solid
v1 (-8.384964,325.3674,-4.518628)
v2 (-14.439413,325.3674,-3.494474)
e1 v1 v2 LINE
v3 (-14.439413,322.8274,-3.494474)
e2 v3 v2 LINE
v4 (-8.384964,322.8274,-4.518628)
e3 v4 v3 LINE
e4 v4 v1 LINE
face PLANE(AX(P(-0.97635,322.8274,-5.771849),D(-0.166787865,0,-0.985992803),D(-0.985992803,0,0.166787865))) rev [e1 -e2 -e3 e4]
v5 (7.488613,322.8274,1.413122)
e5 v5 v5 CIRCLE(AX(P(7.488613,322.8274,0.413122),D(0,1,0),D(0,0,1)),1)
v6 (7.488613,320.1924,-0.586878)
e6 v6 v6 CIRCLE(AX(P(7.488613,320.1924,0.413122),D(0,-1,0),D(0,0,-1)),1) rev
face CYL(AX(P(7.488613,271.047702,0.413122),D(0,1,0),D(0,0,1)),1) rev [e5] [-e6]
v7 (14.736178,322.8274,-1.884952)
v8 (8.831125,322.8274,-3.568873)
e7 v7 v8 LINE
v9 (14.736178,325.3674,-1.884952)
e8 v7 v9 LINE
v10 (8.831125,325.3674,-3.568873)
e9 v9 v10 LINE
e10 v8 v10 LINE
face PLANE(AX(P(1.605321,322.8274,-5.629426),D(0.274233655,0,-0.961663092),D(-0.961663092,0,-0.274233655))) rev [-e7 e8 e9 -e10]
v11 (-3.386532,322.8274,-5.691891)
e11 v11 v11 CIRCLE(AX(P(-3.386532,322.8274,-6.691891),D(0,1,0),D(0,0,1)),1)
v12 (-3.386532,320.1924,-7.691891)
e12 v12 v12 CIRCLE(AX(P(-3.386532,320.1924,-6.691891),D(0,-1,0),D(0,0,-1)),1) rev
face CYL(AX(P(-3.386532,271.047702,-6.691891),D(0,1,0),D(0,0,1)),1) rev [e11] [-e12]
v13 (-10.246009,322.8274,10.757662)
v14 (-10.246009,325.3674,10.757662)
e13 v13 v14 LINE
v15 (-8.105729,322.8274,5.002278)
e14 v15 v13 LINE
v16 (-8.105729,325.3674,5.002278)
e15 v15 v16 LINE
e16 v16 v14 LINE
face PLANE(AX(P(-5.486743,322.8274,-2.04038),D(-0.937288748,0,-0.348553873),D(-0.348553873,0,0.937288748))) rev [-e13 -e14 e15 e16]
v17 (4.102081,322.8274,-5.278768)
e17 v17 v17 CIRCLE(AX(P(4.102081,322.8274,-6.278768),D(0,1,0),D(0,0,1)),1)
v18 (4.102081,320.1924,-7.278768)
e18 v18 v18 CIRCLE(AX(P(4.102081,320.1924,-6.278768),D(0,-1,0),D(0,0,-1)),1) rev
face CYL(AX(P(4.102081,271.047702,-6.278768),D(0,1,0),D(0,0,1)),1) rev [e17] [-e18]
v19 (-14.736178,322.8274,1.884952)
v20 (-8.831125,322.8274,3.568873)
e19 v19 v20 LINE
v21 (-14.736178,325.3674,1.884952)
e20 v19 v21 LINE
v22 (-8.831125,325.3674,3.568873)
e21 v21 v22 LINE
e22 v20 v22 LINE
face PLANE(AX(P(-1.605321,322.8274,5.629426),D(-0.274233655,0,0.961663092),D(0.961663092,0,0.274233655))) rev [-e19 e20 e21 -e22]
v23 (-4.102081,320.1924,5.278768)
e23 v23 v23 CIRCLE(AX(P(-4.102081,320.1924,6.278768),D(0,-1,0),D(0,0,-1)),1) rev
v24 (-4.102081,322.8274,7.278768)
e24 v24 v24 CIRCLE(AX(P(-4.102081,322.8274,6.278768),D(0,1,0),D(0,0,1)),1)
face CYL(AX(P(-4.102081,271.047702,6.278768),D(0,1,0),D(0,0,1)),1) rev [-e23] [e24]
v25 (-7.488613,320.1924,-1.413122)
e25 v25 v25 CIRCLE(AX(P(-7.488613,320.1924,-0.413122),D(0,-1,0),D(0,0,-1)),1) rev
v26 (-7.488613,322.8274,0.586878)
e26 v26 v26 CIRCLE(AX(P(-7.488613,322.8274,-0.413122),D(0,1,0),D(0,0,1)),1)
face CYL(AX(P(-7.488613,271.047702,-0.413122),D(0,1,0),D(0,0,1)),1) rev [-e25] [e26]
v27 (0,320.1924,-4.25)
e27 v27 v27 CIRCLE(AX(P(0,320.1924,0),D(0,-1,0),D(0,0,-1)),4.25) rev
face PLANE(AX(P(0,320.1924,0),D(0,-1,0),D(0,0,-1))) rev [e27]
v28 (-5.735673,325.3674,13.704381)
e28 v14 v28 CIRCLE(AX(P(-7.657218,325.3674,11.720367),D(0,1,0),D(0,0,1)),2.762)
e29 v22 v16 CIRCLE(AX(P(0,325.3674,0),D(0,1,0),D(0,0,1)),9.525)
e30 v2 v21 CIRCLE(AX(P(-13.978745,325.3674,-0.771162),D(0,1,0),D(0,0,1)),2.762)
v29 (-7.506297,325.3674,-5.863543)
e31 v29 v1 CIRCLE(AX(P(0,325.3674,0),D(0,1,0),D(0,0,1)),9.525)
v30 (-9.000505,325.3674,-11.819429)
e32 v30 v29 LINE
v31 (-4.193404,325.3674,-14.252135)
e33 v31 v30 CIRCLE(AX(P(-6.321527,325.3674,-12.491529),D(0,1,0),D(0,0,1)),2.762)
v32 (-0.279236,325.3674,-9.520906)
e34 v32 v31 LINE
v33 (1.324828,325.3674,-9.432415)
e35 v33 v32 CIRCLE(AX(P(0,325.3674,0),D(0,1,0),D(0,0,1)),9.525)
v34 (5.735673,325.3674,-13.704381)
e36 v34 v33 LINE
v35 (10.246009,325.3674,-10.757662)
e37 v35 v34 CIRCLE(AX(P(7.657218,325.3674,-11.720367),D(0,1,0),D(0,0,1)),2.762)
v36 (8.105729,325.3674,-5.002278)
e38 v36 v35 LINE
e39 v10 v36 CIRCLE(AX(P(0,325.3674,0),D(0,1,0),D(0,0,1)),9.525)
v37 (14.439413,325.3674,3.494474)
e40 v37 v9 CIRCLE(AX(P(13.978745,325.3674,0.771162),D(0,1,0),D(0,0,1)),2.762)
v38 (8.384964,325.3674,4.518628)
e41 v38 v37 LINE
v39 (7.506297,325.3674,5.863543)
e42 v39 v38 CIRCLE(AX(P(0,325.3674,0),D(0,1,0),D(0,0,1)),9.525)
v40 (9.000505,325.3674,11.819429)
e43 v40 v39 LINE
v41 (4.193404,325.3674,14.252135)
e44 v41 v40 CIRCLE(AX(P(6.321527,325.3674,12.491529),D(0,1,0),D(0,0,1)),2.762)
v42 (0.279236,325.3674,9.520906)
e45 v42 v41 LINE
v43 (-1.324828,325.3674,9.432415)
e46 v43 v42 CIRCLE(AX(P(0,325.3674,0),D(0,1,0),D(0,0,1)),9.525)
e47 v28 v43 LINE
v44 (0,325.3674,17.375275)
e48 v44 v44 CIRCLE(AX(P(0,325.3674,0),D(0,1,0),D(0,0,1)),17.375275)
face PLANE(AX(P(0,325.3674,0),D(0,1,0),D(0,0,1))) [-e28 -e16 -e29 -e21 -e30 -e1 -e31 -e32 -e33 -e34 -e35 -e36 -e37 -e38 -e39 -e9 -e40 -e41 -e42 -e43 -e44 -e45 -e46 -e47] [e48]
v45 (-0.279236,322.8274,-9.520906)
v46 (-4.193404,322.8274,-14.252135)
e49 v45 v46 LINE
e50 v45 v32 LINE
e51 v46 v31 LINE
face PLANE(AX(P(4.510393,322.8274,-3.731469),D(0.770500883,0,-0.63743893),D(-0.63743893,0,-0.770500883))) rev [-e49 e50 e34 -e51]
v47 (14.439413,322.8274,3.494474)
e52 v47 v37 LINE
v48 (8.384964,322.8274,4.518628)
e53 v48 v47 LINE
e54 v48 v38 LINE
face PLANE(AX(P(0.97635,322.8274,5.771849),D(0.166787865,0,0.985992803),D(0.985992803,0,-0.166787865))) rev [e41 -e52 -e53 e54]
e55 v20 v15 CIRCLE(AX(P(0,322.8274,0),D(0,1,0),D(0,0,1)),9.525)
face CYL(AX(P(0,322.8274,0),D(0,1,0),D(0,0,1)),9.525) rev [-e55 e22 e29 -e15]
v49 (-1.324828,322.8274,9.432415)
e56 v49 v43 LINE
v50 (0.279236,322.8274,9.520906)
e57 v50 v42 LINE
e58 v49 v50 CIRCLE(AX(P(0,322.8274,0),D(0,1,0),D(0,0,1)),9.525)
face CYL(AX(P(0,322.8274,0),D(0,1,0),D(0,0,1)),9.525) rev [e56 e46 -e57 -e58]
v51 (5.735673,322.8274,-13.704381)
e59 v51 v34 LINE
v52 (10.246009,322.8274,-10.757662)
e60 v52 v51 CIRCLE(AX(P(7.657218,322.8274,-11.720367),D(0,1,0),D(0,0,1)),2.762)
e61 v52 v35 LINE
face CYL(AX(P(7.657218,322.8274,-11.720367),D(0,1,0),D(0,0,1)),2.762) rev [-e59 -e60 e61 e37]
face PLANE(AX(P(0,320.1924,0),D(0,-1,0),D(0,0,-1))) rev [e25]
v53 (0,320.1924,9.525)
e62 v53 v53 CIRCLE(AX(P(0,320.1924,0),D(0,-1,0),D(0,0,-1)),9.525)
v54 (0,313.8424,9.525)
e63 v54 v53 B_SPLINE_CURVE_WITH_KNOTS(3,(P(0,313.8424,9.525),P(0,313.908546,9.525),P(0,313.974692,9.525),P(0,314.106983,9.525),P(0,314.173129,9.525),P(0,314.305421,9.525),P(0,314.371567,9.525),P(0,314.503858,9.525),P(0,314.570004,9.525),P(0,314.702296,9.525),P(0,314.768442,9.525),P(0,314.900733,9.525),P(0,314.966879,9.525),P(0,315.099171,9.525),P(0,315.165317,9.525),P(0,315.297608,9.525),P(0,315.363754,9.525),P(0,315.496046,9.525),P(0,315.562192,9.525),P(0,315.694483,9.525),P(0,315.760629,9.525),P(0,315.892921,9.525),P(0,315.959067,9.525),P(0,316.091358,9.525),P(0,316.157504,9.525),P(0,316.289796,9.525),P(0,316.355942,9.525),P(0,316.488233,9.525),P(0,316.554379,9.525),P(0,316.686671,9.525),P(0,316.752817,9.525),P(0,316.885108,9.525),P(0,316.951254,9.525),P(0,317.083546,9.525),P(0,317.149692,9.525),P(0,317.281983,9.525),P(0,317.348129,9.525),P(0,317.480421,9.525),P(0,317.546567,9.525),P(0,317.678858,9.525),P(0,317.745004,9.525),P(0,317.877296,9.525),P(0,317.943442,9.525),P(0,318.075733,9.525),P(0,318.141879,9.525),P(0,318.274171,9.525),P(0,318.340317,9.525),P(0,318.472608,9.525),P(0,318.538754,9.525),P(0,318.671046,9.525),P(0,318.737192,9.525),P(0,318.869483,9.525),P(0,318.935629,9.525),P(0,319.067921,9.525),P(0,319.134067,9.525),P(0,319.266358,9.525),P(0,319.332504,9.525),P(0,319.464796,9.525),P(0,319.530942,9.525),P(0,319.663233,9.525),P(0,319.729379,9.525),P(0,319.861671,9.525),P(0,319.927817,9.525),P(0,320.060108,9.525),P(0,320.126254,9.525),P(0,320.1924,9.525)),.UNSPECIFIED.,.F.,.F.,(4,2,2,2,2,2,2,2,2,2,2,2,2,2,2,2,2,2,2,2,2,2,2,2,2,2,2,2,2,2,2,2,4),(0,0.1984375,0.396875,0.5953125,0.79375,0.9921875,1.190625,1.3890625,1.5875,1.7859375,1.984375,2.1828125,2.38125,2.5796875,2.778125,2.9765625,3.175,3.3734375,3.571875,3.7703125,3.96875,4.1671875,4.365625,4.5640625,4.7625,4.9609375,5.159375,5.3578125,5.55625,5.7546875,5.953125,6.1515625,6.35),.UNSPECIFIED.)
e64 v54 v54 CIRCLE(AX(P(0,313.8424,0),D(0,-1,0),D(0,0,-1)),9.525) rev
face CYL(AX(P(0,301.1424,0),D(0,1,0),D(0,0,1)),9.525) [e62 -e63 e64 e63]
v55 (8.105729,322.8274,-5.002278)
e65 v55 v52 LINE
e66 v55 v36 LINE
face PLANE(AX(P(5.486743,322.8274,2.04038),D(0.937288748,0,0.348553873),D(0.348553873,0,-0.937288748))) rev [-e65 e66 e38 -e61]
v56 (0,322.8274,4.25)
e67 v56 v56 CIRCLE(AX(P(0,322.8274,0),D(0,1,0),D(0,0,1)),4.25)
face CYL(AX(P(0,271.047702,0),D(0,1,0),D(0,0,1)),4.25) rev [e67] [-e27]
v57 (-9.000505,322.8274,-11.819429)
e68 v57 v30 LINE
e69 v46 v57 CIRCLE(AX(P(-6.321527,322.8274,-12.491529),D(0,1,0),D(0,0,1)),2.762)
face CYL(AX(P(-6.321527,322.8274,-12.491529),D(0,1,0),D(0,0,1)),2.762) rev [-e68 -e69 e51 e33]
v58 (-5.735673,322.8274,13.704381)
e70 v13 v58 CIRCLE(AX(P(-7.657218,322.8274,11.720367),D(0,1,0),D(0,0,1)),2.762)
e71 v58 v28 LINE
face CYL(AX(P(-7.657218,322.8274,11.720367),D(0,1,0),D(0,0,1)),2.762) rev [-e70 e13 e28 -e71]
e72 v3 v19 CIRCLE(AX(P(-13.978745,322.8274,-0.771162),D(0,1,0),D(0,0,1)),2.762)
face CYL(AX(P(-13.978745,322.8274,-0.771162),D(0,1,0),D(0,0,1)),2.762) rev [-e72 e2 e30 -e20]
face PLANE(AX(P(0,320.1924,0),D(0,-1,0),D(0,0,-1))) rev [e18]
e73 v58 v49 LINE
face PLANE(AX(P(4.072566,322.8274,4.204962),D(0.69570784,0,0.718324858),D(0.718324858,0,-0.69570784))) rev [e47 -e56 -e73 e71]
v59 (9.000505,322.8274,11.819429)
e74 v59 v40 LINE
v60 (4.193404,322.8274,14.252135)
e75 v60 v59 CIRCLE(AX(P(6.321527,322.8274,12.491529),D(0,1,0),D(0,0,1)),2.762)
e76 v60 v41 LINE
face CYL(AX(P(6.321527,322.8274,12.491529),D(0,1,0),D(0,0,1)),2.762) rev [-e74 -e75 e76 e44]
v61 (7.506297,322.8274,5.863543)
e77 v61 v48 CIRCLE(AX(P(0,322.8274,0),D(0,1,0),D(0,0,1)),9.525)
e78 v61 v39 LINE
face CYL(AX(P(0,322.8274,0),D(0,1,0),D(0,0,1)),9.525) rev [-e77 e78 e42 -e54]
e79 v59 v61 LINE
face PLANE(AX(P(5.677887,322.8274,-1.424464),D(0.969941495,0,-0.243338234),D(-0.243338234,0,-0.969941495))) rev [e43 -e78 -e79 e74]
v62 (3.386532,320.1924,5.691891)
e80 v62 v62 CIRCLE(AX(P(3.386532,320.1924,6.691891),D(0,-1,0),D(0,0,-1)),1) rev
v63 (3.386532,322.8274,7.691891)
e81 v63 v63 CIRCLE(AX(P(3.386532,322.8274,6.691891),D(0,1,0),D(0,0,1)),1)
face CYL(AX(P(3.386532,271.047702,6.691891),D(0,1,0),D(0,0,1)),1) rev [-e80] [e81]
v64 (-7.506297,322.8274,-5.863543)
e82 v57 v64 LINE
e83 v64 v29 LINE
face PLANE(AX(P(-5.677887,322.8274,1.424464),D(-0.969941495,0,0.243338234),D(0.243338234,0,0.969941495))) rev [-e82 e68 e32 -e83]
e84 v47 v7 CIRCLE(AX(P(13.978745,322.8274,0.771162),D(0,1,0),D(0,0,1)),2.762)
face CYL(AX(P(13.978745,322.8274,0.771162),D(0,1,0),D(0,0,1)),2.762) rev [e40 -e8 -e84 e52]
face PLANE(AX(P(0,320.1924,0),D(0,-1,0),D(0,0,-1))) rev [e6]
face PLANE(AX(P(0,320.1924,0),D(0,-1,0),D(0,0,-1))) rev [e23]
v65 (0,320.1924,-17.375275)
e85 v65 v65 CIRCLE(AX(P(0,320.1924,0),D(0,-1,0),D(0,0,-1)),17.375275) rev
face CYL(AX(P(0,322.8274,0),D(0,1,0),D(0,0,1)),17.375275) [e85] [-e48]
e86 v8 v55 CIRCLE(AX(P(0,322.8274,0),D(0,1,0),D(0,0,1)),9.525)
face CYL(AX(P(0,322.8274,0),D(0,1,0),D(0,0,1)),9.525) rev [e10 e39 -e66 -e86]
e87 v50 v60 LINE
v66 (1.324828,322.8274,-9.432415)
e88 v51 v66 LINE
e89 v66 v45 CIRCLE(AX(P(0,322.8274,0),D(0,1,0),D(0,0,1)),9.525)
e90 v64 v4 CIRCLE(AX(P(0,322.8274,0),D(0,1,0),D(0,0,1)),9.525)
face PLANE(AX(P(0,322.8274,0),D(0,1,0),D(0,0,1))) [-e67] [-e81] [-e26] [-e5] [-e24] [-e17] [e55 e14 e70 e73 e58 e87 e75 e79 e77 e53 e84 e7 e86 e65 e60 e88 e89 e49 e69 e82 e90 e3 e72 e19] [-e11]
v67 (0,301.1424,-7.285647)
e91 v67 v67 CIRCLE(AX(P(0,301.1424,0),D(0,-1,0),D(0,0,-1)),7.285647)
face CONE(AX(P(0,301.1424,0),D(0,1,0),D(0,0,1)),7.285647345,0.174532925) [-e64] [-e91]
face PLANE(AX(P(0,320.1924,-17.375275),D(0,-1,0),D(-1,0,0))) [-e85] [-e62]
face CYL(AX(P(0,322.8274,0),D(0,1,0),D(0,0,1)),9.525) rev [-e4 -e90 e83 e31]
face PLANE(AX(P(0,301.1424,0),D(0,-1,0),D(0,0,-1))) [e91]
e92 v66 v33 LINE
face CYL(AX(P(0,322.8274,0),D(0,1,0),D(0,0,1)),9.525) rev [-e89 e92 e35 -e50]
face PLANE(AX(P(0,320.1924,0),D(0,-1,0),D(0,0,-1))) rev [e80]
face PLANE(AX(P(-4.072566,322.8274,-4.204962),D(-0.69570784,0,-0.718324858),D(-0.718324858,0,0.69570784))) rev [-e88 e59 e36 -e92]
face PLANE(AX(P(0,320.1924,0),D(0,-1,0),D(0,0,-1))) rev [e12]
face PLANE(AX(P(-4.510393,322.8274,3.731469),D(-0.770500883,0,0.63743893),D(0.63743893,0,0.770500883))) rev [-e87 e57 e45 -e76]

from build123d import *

# Parameters (mm, degrees)
SKETCH1_R                 = 17.37527472527474
BOSS_EXTRUDE1_DEPTH       = 2.54
BOSS_EXTRUDE2_START       = -5.175
BOSS_EXTRUDE2_OUTLINE_R   = 17.375274725
BOSS_EXTRUDE2_OUTLINE_R_2 = 1
BOSS_EXTRUDE2_OUTLINE_R_3 = 4.25
BOSS_EXTRUDE2_DEPTH       = 2.635
SKETCH2_R                 = 9.525
BOSS_EXTRUDE4_DEPTH       = 19.05
CHAMFER1_SIZE             = 12.7
CHAMFER1_SIZE2            = 2.23935265499751


# Read off the part's stored shape, not the designer's step: Boss-Extrude2
with BuildPart() as part:
    # Sketch1 → Boss-Extrude1 (new body)
    with BuildSketch(Plane(origin=(0, 325.36739999999986, 0), x_dir=(1, 0, 0), z_dir=(0, 1, 0))):
        with Locations(Location((0, 3.66e-14, 0), (0, 0, 270))):
            Circle(SKETCH1_R)
        with BuildLine():
            Line((-8.83112529829345, -3.568872506245661), (-14.736178288860136, -1.88495193133948))
            ThreePointArc((-14.736178288860136, -1.8849519313394787), (-16.73655161171898, 0.9233006813963234), (-14.43941301600355, 3.49447365103826))
            Line((-14.43941301600355, 3.4944736510382595), (-8.384964425073763, 4.51862773308911))
            ThreePointArc((-8.384964425073935, 4.518627733089421), (-7.974035718754682, 5.209642920203345), (-7.506296902423261, 5.863542599203262))
            Line((-7.506296902423427, 5.863542599203276), (-9.000505401882572, 11.81942878717986))
            ThreePointArc((-9.000505401882574, 11.81942878717986), (-7.5686739604387565, 14.955929208196205), (-4.1934035533472525, 14.25213531311389))
            Line((-4.193403553347251, 14.25213531311389), (-0.2792358054370207, 9.520906068487482))
            ThreePointArc((-0.27923580543699295, 9.520906068487529), (0.5246652541642909, 9.510538963227763), (1.3248283958705547, 9.432415105448642))
            Line((1.3248283958705054, 9.432415105448754), (5.7356728869774125, 13.70438071851937))
            ThreePointArc((5.7356728869774125, 13.70438071851937), (9.16787765128006, 14.03262852679995), (10.246009462656167, 10.75766166207572))
            Line((10.246009462656167, 10.75766166207572), (8.1057286196369, 5.0022783353981914))
            ThreePointArc((8.105728619637244, 5.002278335398186), (8.498700972919012, 4.300896043024725), (8.831125298293639, 3.5688725062459628))
            Line((8.831125298293461, 3.5688725062457136), (14.736178288860124, 1.884951931339582))
            ThreePointArc((14.736178288860126, 1.8849519313395824), (16.736551611718987, -0.9233006813962088), (14.43941301600357, -3.494473651038158))
            Line((14.43941301600357, -3.4944736510381578), (8.384964425073758, -4.518627733089059))
            ThreePointArc((8.384964425073925, -4.518627733089367), (7.974035718754691, -5.20964292020326), (7.506296902423297, -5.863542599203144))
            Line((7.5062969024234505, -5.863542599203156), (9.000505401882656, -11.8194287871798))
            ThreePointArc((9.000505401882656, -11.8194287871798), (7.568673960438859, -14.955929208196153), (4.193403553347351, -14.252135313113861))
            Line((4.193403553347352, -14.252135313113861), (0.2792358054370711, -9.520906068487413))
            ThreePointArc((0.2792358054370489, -9.520906068487452), (-0.5246652541641907, -9.510538963227694), (-1.3248283958704137, -9.432415105448587))
            Line((-1.3248283958703642, -9.432415105448698), (-5.735672886977412, -13.70438071851937))
            ThreePointArc((-5.7356728869774125, -13.70438071851937), (-9.167877651280058, -14.032628526799948), (-10.246009462656165, -10.75766166207572))
            Line((-10.246009462656165, -10.75766166207572), (-8.105728619636901, -5.002278335398116))
            ThreePointArc((-8.105728619637246, -5.002278335398109), (-8.498700972919007, -4.300896043024661), (-8.83112529829363, -3.56887250624591))
        make_face(mode=Mode.SUBTRACT)
    extrude(amount=-BOSS_EXTRUDE1_DEPTH)

    # Boss-Extrude2 outline → Boss-Extrude2 (add)
    with BuildSketch(Plane(origin=(0, 325.36739999999986, 0), x_dir=(1, 0, 0), z_dir=(0, 1, 0)).offset(BOSS_EXTRUDE2_START)):
        Circle(BOSS_EXTRUDE2_OUTLINE_R)
        with Locations((-4.10208104, -6.278768282)):
            Circle(BOSS_EXTRUDE2_OUTLINE_R_2, mode=Mode.SUBTRACT)
        with Locations((3.386532317, -6.69189053)):
            Circle(BOSS_EXTRUDE2_OUTLINE_R_2, mode=Mode.SUBTRACT)
        with Locations((7.488613357, -0.413122247)):
            Circle(BOSS_EXTRUDE2_OUTLINE_R_2, mode=Mode.SUBTRACT)
        with Locations((-7.488613357, 0.413122247)):
            Circle(BOSS_EXTRUDE2_OUTLINE_R_2, mode=Mode.SUBTRACT)
        with Locations((-3.386532317, 6.69189053)):
            Circle(BOSS_EXTRUDE2_OUTLINE_R_2, mode=Mode.SUBTRACT)
        Circle(BOSS_EXTRUDE2_OUTLINE_R_3, mode=Mode.SUBTRACT)
        with Locations((4.10208104, 6.278768282)):
            Circle(BOSS_EXTRUDE2_OUTLINE_R_2, mode=Mode.SUBTRACT)
    extrude(amount=BOSS_EXTRUDE2_DEPTH)

    # Sketch2 → Boss-Extrude4 (add)
    with BuildSketch(Plane.XZ.offset(-320.19239999999985)):
        with Locations(Location((0, 0, 0), (0, 0, 90))):
            Circle(SKETCH2_R)
    extrude(amount=BOSS_EXTRUDE4_DEPTH)

    # Chamfer1
    chamfer1_edges = [part.edges().sort_by_distance(p)[0] for p in [
        (-1.75e-15, 301.14239999999984, -9.525),
    ]]
    chamfer1_side = [part.faces().sort_by_distance(p)[0] for p in [
        (-1.75e-15, 310.6673999999999, -9.525),
    ]]
    chamfer(chamfer1_edges, length=CHAMFER1_SIZE, length2=CHAMFER1_SIZE2, reference=chamfer1_side[0])


solid = part.part
